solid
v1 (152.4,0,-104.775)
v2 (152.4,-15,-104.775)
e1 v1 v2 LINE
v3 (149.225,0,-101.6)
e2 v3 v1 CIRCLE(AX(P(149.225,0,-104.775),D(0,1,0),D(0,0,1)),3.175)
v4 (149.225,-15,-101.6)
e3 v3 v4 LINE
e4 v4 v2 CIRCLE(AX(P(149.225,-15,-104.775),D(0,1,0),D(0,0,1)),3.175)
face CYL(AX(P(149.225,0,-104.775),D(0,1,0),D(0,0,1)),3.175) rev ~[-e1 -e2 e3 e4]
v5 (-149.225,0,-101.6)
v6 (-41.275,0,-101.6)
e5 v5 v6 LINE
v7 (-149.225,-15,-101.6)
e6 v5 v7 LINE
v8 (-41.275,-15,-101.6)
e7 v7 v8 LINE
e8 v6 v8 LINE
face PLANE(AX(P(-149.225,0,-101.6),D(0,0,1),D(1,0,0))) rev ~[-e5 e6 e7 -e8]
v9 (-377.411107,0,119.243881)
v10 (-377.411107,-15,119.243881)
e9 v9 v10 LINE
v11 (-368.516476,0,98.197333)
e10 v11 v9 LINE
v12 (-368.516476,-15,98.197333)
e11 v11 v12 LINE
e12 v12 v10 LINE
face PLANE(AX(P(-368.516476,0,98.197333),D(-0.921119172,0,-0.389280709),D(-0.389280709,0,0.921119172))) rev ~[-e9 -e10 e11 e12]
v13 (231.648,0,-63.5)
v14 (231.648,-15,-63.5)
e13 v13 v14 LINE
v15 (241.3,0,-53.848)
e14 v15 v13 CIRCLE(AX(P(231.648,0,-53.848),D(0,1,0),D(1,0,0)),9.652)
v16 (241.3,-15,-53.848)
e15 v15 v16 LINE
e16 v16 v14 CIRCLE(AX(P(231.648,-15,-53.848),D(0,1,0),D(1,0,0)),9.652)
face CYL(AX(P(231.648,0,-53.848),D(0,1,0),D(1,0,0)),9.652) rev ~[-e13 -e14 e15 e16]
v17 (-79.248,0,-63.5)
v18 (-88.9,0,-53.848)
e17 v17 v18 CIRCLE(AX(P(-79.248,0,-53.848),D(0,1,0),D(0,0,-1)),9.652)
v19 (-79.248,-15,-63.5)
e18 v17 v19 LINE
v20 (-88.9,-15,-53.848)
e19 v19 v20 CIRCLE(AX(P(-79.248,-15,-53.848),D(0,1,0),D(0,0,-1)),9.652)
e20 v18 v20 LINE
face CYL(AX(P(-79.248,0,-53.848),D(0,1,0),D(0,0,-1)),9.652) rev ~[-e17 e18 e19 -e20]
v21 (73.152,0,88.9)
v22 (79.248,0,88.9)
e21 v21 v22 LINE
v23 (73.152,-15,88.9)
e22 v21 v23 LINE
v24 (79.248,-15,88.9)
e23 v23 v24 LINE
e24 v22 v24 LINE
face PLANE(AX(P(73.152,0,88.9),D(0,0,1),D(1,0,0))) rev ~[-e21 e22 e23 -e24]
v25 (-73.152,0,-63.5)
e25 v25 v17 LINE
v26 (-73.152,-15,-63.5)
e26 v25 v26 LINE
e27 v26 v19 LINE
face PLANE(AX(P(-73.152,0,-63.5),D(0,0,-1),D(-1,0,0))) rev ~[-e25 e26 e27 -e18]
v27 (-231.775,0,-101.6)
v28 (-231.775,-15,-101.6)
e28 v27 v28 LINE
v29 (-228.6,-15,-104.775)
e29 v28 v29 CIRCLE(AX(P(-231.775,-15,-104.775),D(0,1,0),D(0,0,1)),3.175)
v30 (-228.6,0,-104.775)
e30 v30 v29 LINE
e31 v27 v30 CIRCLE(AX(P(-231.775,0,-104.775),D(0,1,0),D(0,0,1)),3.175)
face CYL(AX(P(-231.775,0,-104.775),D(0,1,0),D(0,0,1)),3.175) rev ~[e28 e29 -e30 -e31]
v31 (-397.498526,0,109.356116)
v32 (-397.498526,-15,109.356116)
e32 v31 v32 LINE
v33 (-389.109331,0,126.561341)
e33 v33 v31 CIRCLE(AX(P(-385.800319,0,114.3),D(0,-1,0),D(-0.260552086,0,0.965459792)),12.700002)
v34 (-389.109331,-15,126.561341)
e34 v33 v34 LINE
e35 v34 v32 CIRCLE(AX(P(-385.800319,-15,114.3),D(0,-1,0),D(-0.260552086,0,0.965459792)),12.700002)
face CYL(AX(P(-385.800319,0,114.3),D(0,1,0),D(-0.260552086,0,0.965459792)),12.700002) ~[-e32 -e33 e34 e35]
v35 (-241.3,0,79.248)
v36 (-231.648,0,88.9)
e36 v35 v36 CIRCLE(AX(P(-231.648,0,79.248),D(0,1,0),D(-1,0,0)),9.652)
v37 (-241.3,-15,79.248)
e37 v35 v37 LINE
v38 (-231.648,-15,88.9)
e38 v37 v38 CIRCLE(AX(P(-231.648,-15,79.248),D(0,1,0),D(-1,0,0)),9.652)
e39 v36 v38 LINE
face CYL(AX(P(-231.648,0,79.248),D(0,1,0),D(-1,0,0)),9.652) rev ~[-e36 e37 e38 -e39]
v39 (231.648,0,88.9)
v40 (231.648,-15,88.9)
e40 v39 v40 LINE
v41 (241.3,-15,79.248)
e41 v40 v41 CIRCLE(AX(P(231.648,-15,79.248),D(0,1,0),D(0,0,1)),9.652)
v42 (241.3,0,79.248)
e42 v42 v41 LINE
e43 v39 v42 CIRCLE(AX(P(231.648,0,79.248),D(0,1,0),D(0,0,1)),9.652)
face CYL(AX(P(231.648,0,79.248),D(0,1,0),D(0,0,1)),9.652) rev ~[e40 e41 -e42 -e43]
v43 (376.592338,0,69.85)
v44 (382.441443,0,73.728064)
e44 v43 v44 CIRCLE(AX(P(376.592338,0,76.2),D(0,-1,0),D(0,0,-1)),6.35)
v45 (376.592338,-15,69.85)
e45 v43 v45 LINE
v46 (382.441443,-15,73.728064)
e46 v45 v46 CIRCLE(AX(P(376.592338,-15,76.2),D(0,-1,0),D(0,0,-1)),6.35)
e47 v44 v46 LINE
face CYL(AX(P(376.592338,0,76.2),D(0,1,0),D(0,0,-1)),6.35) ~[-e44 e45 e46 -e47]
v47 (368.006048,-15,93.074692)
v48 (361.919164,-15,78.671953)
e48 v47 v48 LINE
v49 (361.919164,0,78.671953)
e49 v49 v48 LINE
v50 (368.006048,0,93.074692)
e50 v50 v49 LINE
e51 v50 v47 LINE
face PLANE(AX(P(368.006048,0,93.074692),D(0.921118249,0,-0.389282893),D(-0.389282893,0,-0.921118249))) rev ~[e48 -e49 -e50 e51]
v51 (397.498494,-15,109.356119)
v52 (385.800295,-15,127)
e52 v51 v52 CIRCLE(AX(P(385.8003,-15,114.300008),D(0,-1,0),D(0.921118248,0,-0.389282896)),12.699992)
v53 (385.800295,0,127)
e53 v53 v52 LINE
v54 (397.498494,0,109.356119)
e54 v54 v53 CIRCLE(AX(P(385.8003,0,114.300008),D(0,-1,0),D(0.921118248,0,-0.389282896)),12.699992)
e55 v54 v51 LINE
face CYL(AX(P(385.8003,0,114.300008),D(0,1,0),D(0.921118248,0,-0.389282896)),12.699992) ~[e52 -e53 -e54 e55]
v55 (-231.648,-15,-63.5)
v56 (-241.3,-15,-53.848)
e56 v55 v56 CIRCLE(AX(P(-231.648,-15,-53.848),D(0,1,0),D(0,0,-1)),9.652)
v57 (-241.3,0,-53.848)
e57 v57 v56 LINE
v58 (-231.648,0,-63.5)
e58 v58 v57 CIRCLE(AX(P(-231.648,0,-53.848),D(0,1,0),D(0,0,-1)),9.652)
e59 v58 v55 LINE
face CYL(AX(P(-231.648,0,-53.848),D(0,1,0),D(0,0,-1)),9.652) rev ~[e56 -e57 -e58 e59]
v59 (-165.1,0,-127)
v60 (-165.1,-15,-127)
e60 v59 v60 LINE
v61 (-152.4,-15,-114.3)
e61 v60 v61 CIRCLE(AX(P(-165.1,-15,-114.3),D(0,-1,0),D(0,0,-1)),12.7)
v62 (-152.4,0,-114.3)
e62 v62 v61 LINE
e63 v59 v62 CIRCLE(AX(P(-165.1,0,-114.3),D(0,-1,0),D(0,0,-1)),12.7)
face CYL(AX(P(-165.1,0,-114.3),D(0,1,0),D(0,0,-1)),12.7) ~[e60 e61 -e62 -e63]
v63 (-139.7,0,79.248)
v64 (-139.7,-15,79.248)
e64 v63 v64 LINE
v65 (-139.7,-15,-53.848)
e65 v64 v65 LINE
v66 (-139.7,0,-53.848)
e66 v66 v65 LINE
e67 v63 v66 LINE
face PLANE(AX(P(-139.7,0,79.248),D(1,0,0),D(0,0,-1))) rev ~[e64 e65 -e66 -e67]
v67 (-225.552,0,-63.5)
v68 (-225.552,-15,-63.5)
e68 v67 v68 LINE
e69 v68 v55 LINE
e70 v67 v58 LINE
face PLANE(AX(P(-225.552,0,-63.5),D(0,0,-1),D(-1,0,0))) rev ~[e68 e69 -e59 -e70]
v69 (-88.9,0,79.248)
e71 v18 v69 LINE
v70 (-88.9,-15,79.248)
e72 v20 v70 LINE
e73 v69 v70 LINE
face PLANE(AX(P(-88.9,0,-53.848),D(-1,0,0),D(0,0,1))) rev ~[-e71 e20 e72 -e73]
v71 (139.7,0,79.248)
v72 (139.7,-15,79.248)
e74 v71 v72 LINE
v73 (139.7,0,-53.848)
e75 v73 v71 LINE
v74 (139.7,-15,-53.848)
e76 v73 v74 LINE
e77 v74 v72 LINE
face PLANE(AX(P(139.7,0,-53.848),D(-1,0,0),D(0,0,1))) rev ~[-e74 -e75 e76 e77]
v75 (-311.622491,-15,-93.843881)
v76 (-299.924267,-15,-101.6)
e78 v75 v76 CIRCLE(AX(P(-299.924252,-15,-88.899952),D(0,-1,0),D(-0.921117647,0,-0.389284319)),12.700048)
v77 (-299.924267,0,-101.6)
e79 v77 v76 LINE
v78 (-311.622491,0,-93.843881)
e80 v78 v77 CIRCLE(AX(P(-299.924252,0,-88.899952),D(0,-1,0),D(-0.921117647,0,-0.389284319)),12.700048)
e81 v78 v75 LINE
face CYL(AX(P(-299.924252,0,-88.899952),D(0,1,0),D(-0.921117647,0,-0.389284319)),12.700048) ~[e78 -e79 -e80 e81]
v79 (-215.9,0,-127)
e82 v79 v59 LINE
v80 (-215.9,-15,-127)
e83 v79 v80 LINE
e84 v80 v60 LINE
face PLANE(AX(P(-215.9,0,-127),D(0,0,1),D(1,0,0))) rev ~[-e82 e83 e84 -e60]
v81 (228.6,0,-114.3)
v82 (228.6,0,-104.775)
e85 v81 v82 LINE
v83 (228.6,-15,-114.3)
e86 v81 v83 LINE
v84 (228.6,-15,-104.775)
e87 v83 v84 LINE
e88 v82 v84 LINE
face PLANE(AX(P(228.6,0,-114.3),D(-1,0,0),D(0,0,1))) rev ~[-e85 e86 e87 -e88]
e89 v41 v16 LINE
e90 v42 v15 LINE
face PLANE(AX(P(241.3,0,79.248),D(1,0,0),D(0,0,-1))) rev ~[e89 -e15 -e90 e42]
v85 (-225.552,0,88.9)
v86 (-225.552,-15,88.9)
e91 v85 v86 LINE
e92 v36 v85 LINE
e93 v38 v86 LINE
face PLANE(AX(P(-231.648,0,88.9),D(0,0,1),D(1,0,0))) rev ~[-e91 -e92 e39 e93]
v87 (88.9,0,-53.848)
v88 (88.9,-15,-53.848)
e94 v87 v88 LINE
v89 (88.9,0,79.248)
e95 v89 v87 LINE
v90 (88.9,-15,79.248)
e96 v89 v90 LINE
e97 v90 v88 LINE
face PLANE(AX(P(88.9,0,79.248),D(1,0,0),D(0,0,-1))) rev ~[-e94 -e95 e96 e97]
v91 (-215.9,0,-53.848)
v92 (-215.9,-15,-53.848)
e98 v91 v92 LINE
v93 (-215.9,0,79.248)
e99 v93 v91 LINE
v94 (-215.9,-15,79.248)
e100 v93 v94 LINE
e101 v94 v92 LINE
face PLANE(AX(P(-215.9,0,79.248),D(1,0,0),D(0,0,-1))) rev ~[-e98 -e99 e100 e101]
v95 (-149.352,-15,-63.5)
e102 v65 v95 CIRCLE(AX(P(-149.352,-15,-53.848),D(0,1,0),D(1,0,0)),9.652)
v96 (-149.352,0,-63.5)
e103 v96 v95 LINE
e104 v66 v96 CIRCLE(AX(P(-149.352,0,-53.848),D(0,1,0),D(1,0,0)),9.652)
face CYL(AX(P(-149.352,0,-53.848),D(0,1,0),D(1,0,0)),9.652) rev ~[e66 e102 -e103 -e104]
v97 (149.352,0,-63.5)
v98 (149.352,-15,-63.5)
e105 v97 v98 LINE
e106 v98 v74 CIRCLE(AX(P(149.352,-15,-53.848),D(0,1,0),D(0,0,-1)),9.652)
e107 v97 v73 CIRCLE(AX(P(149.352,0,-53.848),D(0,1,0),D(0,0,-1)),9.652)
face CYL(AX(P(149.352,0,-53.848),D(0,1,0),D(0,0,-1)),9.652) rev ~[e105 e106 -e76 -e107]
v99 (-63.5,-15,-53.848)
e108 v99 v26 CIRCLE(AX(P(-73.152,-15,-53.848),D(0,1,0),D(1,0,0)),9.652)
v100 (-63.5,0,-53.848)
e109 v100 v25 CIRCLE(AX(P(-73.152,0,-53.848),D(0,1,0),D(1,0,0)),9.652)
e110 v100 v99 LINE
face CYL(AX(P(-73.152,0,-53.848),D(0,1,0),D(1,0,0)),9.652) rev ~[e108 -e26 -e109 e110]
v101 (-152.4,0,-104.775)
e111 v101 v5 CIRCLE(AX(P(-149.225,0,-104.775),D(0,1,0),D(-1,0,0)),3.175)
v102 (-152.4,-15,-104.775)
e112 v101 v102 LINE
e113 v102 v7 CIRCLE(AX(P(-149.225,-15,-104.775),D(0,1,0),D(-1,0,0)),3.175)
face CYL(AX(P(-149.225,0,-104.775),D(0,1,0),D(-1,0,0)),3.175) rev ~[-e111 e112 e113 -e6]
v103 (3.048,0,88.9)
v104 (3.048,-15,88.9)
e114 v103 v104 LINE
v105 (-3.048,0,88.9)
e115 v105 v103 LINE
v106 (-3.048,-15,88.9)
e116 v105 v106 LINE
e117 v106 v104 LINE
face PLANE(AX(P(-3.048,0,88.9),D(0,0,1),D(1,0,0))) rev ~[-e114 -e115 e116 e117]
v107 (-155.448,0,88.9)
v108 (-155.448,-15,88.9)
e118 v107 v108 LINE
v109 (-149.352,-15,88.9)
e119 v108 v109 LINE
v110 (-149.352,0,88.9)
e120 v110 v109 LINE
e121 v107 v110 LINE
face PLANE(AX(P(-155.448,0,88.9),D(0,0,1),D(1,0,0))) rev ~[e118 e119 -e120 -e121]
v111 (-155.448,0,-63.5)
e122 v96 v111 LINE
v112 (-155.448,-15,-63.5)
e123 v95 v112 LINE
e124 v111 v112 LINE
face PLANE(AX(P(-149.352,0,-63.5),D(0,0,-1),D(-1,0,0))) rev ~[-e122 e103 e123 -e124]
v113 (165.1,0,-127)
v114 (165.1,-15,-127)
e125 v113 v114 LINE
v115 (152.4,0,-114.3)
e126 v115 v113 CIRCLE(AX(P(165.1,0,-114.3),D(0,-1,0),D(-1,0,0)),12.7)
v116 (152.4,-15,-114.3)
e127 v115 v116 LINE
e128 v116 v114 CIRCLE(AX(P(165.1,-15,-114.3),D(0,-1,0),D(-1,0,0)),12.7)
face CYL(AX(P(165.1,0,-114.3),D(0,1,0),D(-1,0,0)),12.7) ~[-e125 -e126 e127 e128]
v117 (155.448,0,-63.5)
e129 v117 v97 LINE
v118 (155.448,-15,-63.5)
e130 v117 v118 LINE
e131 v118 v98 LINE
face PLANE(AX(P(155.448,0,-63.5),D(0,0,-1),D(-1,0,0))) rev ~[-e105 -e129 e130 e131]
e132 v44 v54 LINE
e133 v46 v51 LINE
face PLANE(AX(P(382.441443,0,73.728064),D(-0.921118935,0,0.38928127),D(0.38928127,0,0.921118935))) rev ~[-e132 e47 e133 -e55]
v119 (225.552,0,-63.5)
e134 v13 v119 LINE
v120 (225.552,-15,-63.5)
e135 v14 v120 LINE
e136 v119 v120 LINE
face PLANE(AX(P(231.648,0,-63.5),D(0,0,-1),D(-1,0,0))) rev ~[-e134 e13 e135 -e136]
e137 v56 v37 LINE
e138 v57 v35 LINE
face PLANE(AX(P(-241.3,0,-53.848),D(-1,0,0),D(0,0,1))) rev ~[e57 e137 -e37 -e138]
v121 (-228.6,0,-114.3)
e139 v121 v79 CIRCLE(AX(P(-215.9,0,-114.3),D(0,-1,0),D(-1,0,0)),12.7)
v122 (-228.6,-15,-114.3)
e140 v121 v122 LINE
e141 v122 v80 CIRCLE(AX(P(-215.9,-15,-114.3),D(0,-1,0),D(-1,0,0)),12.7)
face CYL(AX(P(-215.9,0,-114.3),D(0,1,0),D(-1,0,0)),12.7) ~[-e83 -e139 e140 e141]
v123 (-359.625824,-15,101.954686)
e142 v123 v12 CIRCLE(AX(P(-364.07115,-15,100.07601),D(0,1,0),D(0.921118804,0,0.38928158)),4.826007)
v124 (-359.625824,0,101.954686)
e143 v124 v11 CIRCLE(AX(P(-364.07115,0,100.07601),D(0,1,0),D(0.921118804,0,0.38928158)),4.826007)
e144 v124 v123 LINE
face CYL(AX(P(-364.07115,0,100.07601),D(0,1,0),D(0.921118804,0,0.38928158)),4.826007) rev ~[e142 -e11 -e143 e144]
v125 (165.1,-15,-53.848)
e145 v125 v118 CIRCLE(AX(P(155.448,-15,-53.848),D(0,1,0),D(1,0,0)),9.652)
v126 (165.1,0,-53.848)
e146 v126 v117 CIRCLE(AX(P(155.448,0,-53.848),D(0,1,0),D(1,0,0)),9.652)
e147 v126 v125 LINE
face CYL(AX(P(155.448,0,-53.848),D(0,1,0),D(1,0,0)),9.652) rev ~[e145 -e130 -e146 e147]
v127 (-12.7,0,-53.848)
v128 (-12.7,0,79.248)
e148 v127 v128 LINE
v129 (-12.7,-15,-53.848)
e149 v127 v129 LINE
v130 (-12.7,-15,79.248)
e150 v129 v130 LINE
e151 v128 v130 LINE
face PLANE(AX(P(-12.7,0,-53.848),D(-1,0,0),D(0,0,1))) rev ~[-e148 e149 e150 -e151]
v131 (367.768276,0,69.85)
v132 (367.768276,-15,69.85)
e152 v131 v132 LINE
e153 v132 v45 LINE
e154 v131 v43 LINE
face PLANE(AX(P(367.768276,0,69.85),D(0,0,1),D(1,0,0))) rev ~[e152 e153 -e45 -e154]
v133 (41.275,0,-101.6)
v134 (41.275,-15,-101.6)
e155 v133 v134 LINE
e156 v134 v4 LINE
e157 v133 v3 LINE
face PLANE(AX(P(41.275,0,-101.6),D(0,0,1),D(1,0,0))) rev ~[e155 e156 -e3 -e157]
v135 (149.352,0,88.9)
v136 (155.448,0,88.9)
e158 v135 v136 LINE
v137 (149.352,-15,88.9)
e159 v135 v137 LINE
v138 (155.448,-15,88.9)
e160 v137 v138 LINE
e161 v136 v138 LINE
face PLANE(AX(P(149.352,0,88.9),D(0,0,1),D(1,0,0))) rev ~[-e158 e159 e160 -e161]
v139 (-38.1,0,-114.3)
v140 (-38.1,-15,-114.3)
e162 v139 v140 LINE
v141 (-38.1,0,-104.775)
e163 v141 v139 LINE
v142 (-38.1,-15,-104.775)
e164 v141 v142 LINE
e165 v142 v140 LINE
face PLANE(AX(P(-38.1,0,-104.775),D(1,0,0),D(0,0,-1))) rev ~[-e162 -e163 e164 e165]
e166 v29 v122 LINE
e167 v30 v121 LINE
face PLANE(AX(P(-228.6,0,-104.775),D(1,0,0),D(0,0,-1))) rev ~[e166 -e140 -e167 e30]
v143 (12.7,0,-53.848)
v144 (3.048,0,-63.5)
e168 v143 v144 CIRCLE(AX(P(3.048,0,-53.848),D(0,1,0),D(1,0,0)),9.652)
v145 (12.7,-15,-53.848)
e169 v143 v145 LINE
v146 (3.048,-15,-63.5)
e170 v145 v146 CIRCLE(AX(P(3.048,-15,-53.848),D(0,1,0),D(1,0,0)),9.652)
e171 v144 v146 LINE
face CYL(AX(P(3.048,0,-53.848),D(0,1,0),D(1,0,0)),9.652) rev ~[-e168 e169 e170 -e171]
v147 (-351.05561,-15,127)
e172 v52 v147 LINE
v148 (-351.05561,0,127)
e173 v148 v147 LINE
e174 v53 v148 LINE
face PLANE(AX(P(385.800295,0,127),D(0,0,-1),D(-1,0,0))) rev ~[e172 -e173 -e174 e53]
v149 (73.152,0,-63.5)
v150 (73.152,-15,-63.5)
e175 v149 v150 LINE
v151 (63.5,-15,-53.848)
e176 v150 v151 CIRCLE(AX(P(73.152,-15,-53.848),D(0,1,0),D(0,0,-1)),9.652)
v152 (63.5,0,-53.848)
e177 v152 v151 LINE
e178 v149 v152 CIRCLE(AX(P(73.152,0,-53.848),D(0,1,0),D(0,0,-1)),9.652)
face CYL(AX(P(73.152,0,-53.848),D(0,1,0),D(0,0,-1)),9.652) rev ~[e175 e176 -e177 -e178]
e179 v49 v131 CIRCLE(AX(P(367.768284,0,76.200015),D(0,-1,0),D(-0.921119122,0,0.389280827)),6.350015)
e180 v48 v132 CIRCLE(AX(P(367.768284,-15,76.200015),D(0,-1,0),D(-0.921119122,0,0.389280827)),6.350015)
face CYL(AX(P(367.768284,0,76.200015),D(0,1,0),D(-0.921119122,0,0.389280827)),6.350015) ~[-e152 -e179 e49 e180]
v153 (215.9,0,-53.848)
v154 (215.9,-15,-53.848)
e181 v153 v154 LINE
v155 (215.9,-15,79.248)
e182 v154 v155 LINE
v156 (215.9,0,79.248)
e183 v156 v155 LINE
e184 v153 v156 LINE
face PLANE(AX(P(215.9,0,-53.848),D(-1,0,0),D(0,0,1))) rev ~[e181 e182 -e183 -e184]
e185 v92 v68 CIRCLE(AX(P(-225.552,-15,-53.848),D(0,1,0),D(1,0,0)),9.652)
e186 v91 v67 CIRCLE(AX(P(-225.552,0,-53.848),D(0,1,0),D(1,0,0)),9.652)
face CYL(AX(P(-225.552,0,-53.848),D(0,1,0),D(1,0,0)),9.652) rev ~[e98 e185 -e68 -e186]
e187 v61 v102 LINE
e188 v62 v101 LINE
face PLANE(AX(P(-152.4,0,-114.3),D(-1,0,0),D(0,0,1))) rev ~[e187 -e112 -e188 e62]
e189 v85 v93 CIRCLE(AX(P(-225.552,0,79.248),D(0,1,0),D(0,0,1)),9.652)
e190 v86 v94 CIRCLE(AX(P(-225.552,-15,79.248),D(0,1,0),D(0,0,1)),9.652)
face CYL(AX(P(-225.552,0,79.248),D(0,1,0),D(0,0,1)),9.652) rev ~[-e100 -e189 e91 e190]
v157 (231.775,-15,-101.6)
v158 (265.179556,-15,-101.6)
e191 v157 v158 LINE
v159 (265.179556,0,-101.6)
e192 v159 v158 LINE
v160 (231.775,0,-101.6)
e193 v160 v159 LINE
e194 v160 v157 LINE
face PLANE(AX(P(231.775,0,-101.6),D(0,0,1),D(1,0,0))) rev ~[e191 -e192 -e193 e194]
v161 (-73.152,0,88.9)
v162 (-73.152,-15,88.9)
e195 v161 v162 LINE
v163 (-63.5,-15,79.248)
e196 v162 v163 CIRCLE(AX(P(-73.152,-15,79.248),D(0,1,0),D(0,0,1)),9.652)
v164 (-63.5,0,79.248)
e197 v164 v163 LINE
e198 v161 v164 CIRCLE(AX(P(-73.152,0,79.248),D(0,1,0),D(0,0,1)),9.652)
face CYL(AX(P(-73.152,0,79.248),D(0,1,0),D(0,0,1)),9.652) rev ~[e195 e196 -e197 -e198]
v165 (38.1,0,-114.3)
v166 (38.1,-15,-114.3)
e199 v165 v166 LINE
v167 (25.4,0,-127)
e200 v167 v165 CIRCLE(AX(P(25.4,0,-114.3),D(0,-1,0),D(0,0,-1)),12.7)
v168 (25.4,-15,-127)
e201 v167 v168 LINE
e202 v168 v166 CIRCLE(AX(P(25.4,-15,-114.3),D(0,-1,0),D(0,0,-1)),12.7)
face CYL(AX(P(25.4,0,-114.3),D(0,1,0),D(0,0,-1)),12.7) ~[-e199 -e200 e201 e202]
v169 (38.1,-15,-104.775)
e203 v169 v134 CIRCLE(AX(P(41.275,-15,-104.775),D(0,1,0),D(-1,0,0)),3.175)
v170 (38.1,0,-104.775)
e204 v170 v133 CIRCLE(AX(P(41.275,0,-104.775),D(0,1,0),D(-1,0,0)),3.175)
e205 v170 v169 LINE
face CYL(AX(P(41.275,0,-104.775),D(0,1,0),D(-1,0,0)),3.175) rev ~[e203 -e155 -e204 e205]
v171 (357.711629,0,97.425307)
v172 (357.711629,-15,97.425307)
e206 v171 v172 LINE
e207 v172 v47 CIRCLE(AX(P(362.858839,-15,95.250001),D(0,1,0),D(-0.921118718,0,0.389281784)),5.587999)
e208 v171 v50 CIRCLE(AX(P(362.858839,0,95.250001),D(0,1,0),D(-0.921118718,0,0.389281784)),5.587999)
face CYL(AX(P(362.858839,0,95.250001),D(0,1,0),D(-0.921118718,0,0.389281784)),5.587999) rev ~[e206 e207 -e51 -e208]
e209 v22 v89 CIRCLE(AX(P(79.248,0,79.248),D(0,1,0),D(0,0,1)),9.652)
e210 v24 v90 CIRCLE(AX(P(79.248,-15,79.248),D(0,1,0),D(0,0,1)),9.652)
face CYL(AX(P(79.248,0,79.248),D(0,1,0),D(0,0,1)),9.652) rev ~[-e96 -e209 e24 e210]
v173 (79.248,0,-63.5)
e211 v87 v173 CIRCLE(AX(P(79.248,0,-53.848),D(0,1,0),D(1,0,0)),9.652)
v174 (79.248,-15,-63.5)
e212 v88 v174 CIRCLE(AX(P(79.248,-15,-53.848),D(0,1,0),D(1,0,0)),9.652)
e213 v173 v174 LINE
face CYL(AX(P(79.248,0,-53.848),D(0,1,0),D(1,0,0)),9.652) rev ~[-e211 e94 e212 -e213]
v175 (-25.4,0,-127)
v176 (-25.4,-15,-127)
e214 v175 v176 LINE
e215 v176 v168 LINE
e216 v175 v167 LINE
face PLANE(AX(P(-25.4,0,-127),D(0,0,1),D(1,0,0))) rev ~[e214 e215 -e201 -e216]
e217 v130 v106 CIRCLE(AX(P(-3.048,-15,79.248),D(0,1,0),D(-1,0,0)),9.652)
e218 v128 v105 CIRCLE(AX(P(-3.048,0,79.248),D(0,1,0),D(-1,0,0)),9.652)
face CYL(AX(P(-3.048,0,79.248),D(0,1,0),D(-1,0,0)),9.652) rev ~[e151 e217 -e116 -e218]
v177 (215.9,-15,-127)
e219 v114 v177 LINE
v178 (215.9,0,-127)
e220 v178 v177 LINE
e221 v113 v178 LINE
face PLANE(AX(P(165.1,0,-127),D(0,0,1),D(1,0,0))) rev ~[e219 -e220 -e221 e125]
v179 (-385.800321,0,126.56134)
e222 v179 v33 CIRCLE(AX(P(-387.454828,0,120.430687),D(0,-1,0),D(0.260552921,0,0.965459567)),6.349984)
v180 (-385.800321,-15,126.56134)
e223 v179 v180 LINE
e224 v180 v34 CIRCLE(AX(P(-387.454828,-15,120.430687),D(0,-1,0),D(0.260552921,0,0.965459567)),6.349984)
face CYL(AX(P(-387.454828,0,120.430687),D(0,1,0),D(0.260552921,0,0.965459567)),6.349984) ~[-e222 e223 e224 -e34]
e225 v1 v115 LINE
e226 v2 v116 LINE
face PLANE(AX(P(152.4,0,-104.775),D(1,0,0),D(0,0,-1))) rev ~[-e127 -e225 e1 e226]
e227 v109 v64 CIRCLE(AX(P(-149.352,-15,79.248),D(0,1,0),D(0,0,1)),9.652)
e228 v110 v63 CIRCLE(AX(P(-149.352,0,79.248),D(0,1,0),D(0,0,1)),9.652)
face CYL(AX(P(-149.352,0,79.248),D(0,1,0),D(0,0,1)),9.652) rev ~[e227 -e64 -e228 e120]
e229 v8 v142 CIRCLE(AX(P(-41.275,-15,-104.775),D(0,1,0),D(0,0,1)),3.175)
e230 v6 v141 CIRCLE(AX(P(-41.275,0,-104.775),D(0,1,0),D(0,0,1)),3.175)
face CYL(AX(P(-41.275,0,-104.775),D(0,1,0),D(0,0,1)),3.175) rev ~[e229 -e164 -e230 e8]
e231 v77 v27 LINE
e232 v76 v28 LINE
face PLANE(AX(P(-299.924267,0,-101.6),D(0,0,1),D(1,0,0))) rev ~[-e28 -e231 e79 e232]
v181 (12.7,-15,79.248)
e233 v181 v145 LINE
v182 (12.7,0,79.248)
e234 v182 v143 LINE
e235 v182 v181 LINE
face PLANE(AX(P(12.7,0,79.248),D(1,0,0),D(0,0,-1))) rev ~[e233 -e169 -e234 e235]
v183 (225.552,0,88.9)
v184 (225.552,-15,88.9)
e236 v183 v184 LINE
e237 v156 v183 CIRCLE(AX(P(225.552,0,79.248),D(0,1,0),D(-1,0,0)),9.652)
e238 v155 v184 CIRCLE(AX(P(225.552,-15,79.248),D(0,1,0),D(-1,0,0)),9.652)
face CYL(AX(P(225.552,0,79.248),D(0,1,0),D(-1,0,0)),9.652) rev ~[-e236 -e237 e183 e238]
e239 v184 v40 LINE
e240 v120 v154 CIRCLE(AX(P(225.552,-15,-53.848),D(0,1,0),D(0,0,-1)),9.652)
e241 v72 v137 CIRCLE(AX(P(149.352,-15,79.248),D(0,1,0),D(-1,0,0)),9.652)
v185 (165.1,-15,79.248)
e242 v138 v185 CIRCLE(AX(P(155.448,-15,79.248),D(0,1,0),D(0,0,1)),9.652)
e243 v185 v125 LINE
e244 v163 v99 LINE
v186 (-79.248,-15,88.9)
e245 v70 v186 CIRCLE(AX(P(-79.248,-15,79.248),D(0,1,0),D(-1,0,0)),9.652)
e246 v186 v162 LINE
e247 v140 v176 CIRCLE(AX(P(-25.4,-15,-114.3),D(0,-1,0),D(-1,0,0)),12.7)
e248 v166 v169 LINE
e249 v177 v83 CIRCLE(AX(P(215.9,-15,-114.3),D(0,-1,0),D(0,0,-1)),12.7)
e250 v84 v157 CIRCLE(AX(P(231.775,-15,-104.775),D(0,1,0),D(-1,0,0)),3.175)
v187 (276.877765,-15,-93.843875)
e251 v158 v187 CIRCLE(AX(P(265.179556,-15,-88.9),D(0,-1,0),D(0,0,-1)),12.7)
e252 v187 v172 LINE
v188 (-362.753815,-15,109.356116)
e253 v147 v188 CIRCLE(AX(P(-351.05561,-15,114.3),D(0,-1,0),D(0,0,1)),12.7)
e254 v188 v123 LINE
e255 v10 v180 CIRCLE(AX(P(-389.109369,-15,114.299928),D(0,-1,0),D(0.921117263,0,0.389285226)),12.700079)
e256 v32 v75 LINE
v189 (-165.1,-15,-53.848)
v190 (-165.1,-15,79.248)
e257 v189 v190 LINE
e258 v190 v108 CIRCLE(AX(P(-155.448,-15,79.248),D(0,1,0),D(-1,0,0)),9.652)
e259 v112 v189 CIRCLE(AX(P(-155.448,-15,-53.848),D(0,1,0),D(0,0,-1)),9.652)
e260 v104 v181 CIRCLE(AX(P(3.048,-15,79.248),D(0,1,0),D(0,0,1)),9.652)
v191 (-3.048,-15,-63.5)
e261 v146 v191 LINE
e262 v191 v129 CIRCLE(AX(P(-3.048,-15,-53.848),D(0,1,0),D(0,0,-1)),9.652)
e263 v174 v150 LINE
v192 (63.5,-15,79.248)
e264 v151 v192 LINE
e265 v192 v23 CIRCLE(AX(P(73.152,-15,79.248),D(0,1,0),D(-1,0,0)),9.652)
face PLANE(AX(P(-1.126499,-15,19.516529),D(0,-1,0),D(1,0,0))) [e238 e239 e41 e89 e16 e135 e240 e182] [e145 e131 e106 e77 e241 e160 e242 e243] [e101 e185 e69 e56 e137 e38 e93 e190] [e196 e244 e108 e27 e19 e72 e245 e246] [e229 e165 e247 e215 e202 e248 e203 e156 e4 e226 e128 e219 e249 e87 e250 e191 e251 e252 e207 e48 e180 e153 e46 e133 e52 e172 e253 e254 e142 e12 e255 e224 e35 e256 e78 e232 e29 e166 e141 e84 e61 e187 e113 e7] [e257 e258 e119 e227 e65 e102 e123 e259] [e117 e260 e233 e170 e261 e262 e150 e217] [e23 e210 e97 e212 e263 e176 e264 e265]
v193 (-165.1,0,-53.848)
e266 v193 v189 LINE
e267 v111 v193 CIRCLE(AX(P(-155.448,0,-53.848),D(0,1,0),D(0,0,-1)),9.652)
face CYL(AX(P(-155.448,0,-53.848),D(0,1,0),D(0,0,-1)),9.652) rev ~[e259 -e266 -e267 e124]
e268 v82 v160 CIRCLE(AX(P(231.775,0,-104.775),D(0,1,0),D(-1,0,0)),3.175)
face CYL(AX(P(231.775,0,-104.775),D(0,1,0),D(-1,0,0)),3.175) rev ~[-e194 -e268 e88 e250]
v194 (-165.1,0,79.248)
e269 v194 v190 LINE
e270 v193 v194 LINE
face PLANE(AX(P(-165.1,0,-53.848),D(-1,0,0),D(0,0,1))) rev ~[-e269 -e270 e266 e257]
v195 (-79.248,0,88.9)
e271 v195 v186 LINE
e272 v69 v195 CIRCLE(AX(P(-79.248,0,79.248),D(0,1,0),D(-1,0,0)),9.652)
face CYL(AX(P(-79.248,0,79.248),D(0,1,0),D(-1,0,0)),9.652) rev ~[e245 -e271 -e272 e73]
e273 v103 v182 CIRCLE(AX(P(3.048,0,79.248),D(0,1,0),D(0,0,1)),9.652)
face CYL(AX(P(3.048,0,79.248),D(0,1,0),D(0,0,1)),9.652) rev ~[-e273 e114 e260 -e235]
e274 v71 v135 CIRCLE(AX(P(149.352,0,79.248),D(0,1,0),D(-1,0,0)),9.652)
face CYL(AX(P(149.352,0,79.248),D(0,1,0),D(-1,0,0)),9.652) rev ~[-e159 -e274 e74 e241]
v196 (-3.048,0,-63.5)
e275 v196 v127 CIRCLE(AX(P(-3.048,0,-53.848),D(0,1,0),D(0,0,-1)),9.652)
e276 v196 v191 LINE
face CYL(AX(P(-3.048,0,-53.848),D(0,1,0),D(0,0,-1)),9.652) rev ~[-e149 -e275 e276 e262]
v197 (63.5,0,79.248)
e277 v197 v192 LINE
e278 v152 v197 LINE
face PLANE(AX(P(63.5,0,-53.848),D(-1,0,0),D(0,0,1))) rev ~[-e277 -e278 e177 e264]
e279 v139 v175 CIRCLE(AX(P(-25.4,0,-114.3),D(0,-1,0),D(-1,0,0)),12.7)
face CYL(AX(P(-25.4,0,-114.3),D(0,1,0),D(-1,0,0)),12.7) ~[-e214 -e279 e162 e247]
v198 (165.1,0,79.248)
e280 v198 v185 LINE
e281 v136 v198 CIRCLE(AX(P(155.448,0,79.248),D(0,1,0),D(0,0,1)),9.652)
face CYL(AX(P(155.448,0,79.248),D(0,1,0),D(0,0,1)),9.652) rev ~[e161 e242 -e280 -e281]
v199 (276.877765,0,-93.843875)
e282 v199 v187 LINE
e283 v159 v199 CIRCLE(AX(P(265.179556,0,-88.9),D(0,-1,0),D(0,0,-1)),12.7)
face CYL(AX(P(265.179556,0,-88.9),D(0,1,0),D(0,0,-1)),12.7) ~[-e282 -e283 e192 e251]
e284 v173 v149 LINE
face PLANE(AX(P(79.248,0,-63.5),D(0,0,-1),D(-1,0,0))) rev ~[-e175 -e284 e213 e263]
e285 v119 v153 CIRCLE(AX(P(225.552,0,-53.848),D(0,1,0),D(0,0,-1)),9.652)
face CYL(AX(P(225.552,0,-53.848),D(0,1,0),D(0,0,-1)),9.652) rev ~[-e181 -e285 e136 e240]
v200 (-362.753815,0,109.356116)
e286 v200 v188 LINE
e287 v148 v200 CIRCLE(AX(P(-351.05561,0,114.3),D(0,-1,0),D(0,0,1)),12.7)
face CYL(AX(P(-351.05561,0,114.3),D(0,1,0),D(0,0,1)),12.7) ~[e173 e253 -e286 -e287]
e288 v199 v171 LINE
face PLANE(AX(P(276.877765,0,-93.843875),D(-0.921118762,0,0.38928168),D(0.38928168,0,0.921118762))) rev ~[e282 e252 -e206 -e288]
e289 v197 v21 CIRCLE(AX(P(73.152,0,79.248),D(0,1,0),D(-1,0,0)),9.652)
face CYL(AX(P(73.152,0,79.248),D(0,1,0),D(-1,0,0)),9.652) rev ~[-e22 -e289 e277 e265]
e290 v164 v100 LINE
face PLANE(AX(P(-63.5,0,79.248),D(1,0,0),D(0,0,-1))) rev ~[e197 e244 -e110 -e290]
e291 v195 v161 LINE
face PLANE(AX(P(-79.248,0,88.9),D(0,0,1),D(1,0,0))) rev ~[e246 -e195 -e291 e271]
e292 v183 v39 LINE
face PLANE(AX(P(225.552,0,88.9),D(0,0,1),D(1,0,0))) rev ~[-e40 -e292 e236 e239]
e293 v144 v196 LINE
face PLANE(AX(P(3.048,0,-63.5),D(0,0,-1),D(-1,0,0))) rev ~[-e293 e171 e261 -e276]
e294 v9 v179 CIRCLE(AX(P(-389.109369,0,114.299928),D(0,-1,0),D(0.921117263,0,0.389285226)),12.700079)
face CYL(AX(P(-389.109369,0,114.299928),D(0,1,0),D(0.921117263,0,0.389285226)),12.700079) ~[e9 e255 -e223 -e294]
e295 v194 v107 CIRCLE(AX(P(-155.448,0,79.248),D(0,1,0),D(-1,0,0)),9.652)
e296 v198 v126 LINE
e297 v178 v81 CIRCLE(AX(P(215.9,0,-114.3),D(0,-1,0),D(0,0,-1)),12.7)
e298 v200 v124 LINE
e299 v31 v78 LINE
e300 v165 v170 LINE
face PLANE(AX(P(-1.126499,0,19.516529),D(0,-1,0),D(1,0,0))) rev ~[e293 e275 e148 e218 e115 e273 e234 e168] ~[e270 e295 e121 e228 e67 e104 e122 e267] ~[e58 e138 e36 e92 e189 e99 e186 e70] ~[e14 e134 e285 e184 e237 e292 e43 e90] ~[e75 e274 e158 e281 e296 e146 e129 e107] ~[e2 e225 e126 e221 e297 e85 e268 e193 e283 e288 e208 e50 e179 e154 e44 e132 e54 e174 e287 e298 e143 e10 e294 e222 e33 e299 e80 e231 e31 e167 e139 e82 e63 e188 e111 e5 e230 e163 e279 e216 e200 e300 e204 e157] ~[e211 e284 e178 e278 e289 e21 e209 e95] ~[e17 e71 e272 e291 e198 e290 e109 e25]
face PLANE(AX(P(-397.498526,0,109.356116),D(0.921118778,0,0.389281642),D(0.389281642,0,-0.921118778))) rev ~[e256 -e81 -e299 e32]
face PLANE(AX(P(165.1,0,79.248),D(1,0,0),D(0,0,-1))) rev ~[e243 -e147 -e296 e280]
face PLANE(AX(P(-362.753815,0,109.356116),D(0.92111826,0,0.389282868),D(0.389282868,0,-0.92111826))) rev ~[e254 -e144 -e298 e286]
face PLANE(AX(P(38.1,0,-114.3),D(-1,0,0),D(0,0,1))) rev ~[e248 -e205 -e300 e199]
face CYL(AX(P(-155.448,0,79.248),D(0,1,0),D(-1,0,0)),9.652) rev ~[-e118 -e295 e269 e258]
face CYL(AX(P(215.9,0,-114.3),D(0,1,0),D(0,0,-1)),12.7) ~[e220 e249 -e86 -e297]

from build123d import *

# Parameters (mm, degrees)
F1_DEPTH = 15


# Not quite as in the source:
# - ends of sketch curves that miss each other by under 0.0002 mm in the source are joined


with BuildPart() as f1:
    # F0 (on Front) → F1 (new body)
    with BuildSketch(Plane.XZ):
        with BuildLine():
            Line((152.4, -104.775), (152.4, -114.3))
            ThreePointArc((152.4, -114.3), (156.1197438789, -123.2802561211), (165.1, -127))
            Line((165.1, -127), (215.9, -127))
            ThreePointArc((215.9, -127), (224.8802561211, -123.2802561211), (228.6, -114.3))
            Line((228.6, -114.3), (228.6, -104.775))
            ThreePointArc((228.6, -104.775), (229.5299359697, -102.5299359697), (231.775, -101.6))
            Line((231.775, -101.6), (265.179556, -101.6))
            ThreePointArc((265.179556, -101.6), (272.1974896575, -99.4848291048), (276.8777652022, -93.8438751462))
            Line((276.8777652022, -93.8438751462), (357.711629, 97.4253068))
            ThreePointArc((357.711629, 97.4253068), (365.0341452454, 100.3972108736), (368.0060482736, 93.0746921546))
            Line((368.0060482736, 93.0746921546), (361.9191644, 78.6719534))
            ThreePointArc((361.9191644, 78.6719534), (362.4758586154, 72.6910380462), (367.7682764, 69.85))
            Line((367.7682764, 69.85), (376.592338, 69.85))
            ThreePointArc((376.592338, 69.85), (380.1013055832, 70.9075859478), (382.4414433059, 73.7280640946))
            Line((382.4414433059, 73.7280640946), (397.4984938, 109.3561186))
            ThreePointArc((397.4984938, 109.3561186), (396.3851270368, 121.3179295371), (385.8002952, 127))
            Line((385.8002952, 127), (-351.0556098, 127))
            ThreePointArc((-351.0556098, 127), (-361.6404416368, 121.3179295371), (-362.7538151531, 109.356115746))
            Line((-362.7538151531, 109.356115746), (-359.6258238, 101.9546856))
            ThreePointArc((-359.6258238, 101.9546856), (-362.1924804362, 95.6306809293), (-368.5164757001, 98.1973326577))
            Line((-368.5164757001, 98.1973326577), (-377.411107, 119.2438814))
            ThreePointArc((-377.411107, 119.2438814), (-380.76124871, 123.8707639235), (-385.8003211895, 126.5613398156))
            ThreePointArc((-385.8003211895, 126.5613398156), (-387.4548258, 126.780671), (-389.1093307052, 126.5613409078))
            ThreePointArc((-389.1093307052, 126.5613409078), (-397.2156200075, 119.8660524106), (-397.4985259531, 109.356115746))
            Line((-397.4985259531, 109.356115746), (-311.6224908, -93.8438814))
            ThreePointArc((-311.6224908, -93.8438814), (-306.9422004575, -99.4848291048), (-299.9242668, -101.6))
            Line((-299.9242668, -101.6), (-231.775, -101.6))
            ThreePointArc((-231.775, -101.6), (-229.5299359697, -102.5299359697), (-228.6, -104.775))
            Line((-228.6, -104.775), (-228.6, -114.3))
            ThreePointArc((-228.6, -114.3), (-224.8802561211, -123.2802561211), (-215.9, -127))
            Line((-215.9, -127), (-165.1, -127))
            ThreePointArc((-165.1, -127), (-156.1197438789, -123.2802561211), (-152.4, -114.3))
            Line((-152.4, -114.3), (-152.4, -104.775))
            ThreePointArc((-152.4, -104.775), (-151.4700640303, -102.5299359697), (-149.225, -101.6))
            Line((-149.225, -101.6), (-41.275, -101.6))
            ThreePointArc((-41.275, -101.6), (-39.0299359697, -102.5299359697), (-38.1, -104.775))
            Line((-38.1, -104.775), (-38.1, -114.3))
            ThreePointArc((-38.1, -114.3), (-34.3802561211, -123.2802561211), (-25.4, -127))
            Line((-25.4, -127), (25.4, -127))
            ThreePointArc((25.4, -127), (34.3802561211, -123.2802561211), (38.1, -114.3))
            Line((38.1, -114.3), (38.1, -104.775))
            ThreePointArc((38.1, -104.775), (39.0299359697, -102.5299359697), (41.275, -101.6))
            Line((41.275, -101.6), (149.225, -101.6))
            ThreePointArc((149.225, -101.6), (151.4700640303, -102.5299359697), (152.4, -104.775))
        make_face()
        with BuildLine():
            ThreePointArc((-215.9, -53.848), (-218.727005348, -60.672994652), (-225.552, -63.5))
            Line((-225.552, -63.5), (-231.648, -63.5))
            ThreePointArc((-231.648, -63.5), (-238.472994652, -60.672994652), (-241.3, -53.848))
            Line((-241.3, -53.848), (-241.3, 79.248))
            ThreePointArc((-241.3, 79.248), (-238.472994652, 86.072994652), (-231.648, 88.9))
            Line((-231.648, 88.9), (-225.552, 88.9))
            ThreePointArc((-225.552, 88.9), (-218.727005348, 86.072994652), (-215.9, 79.248))
            Line((-215.9, 79.248), (-215.9, -53.848))
        make_face(mode=Mode.SUBTRACT)
        with BuildLine():
            ThreePointArc((-139.7, -53.848), (-142.527005348, -60.672994652), (-149.352, -63.5))
            Line((-149.352, -63.5), (-155.448, -63.5))
            ThreePointArc((-155.448, -63.5), (-162.272994652, -60.672994652), (-165.1, -53.848))
            Line((-165.1, -53.848), (-165.1, 79.248))
            ThreePointArc((-165.1, 79.248), (-162.272994652, 86.072994652), (-155.448, 88.9))
            Line((-155.448, 88.9), (-149.352, 88.9))
            ThreePointArc((-149.352, 88.9), (-142.527005348, 86.072994652), (-139.7, 79.248))
            Line((-139.7, 79.248), (-139.7, -53.848))
        make_face(mode=Mode.SUBTRACT)
        with BuildLine():
            ThreePointArc((-63.5, -53.848), (-66.327005348, -60.672994652), (-73.152, -63.5))
            Line((-73.152, -63.5), (-79.248, -63.5))
            ThreePointArc((-79.248, -63.5), (-86.072994652, -60.672994652), (-88.9, -53.848))
            Line((-88.9, -53.848), (-88.9, 79.248))
            ThreePointArc((-88.9, 79.248), (-86.072994652, 86.072994652), (-79.248, 88.9))
            Line((-79.248, 88.9), (-73.152, 88.9))
            ThreePointArc((-73.152, 88.9), (-66.327005348, 86.072994652), (-63.5, 79.248))
            Line((-63.5, 79.248), (-63.5, -53.848))
        make_face(mode=Mode.SUBTRACT)
        with BuildLine():
            ThreePointArc((12.7, -53.848), (9.872994652, -60.672994652), (3.048, -63.5))
            Line((3.048, -63.5), (-3.048, -63.5))
            ThreePointArc((-3.048, -63.5), (-9.872994652, -60.672994652), (-12.7, -53.848))
            Line((-12.7, -53.848), (-12.7, 79.248))
            ThreePointArc((-12.7, 79.248), (-9.872994652, 86.072994652), (-3.048, 88.9))
            Line((-3.048, 88.9), (3.048, 88.9))
            ThreePointArc((3.048, 88.9), (9.872994652, 86.072994652), (12.7, 79.248))
            Line((12.7, 79.248), (12.7, -53.848))
        make_face(mode=Mode.SUBTRACT)
        with BuildLine():
            ThreePointArc((88.9, -53.848), (86.072994652, -60.672994652), (79.248, -63.5))
            Line((79.248, -63.5), (73.152, -63.5))
            ThreePointArc((73.152, -63.5), (66.327005348, -60.672994652), (63.5, -53.848))
            Line((63.5, -53.848), (63.5, 79.248))
            ThreePointArc((63.5, 79.248), (66.327005348, 86.072994652), (73.152, 88.9))
            Line((73.152, 88.9), (79.248, 88.9))
            ThreePointArc((79.248, 88.9), (86.072994652, 86.072994652), (88.9, 79.248))
            Line((88.9, 79.248), (88.9, -53.848))
        make_face(mode=Mode.SUBTRACT)
        with BuildLine():
            ThreePointArc((165.1, -53.848), (162.272994652, -60.672994652), (155.448, -63.5))
            Line((155.448, -63.5), (149.352, -63.5))
            ThreePointArc((149.352, -63.5), (142.527005348, -60.672994652), (139.7, -53.848))
            Line((139.7, -53.848), (139.7, 79.248))
            ThreePointArc((139.7, 79.248), (142.527005348, 86.072994652), (149.352, 88.9))
            Line((149.352, 88.9), (155.448, 88.9))
            ThreePointArc((155.448, 88.9), (162.272994652, 86.072994652), (165.1, 79.248))
            Line((165.1, 79.248), (165.1, -53.848))
        make_face(mode=Mode.SUBTRACT)
        with BuildLine():
            ThreePointArc((241.3, -53.848), (238.472994652, -60.672994652), (231.648, -63.5))
            Line((231.648, -63.5), (225.552, -63.5))
            ThreePointArc((225.552, -63.5), (218.727005348, -60.672994652), (215.9, -53.848))
            Line((215.9, -53.848), (215.9, 79.248))
            ThreePointArc((215.9, 79.248), (218.727005348, 86.072994652), (225.552, 88.9))
            Line((225.552, 88.9), (231.648, 88.9))
            ThreePointArc((231.648, 88.9), (238.472994652, 86.072994652), (241.3, 79.248))
            Line((241.3, 79.248), (241.3, -53.848))
        make_face(mode=Mode.SUBTRACT)
    extrude(amount=F1_DEPTH)


solid = f1.part
